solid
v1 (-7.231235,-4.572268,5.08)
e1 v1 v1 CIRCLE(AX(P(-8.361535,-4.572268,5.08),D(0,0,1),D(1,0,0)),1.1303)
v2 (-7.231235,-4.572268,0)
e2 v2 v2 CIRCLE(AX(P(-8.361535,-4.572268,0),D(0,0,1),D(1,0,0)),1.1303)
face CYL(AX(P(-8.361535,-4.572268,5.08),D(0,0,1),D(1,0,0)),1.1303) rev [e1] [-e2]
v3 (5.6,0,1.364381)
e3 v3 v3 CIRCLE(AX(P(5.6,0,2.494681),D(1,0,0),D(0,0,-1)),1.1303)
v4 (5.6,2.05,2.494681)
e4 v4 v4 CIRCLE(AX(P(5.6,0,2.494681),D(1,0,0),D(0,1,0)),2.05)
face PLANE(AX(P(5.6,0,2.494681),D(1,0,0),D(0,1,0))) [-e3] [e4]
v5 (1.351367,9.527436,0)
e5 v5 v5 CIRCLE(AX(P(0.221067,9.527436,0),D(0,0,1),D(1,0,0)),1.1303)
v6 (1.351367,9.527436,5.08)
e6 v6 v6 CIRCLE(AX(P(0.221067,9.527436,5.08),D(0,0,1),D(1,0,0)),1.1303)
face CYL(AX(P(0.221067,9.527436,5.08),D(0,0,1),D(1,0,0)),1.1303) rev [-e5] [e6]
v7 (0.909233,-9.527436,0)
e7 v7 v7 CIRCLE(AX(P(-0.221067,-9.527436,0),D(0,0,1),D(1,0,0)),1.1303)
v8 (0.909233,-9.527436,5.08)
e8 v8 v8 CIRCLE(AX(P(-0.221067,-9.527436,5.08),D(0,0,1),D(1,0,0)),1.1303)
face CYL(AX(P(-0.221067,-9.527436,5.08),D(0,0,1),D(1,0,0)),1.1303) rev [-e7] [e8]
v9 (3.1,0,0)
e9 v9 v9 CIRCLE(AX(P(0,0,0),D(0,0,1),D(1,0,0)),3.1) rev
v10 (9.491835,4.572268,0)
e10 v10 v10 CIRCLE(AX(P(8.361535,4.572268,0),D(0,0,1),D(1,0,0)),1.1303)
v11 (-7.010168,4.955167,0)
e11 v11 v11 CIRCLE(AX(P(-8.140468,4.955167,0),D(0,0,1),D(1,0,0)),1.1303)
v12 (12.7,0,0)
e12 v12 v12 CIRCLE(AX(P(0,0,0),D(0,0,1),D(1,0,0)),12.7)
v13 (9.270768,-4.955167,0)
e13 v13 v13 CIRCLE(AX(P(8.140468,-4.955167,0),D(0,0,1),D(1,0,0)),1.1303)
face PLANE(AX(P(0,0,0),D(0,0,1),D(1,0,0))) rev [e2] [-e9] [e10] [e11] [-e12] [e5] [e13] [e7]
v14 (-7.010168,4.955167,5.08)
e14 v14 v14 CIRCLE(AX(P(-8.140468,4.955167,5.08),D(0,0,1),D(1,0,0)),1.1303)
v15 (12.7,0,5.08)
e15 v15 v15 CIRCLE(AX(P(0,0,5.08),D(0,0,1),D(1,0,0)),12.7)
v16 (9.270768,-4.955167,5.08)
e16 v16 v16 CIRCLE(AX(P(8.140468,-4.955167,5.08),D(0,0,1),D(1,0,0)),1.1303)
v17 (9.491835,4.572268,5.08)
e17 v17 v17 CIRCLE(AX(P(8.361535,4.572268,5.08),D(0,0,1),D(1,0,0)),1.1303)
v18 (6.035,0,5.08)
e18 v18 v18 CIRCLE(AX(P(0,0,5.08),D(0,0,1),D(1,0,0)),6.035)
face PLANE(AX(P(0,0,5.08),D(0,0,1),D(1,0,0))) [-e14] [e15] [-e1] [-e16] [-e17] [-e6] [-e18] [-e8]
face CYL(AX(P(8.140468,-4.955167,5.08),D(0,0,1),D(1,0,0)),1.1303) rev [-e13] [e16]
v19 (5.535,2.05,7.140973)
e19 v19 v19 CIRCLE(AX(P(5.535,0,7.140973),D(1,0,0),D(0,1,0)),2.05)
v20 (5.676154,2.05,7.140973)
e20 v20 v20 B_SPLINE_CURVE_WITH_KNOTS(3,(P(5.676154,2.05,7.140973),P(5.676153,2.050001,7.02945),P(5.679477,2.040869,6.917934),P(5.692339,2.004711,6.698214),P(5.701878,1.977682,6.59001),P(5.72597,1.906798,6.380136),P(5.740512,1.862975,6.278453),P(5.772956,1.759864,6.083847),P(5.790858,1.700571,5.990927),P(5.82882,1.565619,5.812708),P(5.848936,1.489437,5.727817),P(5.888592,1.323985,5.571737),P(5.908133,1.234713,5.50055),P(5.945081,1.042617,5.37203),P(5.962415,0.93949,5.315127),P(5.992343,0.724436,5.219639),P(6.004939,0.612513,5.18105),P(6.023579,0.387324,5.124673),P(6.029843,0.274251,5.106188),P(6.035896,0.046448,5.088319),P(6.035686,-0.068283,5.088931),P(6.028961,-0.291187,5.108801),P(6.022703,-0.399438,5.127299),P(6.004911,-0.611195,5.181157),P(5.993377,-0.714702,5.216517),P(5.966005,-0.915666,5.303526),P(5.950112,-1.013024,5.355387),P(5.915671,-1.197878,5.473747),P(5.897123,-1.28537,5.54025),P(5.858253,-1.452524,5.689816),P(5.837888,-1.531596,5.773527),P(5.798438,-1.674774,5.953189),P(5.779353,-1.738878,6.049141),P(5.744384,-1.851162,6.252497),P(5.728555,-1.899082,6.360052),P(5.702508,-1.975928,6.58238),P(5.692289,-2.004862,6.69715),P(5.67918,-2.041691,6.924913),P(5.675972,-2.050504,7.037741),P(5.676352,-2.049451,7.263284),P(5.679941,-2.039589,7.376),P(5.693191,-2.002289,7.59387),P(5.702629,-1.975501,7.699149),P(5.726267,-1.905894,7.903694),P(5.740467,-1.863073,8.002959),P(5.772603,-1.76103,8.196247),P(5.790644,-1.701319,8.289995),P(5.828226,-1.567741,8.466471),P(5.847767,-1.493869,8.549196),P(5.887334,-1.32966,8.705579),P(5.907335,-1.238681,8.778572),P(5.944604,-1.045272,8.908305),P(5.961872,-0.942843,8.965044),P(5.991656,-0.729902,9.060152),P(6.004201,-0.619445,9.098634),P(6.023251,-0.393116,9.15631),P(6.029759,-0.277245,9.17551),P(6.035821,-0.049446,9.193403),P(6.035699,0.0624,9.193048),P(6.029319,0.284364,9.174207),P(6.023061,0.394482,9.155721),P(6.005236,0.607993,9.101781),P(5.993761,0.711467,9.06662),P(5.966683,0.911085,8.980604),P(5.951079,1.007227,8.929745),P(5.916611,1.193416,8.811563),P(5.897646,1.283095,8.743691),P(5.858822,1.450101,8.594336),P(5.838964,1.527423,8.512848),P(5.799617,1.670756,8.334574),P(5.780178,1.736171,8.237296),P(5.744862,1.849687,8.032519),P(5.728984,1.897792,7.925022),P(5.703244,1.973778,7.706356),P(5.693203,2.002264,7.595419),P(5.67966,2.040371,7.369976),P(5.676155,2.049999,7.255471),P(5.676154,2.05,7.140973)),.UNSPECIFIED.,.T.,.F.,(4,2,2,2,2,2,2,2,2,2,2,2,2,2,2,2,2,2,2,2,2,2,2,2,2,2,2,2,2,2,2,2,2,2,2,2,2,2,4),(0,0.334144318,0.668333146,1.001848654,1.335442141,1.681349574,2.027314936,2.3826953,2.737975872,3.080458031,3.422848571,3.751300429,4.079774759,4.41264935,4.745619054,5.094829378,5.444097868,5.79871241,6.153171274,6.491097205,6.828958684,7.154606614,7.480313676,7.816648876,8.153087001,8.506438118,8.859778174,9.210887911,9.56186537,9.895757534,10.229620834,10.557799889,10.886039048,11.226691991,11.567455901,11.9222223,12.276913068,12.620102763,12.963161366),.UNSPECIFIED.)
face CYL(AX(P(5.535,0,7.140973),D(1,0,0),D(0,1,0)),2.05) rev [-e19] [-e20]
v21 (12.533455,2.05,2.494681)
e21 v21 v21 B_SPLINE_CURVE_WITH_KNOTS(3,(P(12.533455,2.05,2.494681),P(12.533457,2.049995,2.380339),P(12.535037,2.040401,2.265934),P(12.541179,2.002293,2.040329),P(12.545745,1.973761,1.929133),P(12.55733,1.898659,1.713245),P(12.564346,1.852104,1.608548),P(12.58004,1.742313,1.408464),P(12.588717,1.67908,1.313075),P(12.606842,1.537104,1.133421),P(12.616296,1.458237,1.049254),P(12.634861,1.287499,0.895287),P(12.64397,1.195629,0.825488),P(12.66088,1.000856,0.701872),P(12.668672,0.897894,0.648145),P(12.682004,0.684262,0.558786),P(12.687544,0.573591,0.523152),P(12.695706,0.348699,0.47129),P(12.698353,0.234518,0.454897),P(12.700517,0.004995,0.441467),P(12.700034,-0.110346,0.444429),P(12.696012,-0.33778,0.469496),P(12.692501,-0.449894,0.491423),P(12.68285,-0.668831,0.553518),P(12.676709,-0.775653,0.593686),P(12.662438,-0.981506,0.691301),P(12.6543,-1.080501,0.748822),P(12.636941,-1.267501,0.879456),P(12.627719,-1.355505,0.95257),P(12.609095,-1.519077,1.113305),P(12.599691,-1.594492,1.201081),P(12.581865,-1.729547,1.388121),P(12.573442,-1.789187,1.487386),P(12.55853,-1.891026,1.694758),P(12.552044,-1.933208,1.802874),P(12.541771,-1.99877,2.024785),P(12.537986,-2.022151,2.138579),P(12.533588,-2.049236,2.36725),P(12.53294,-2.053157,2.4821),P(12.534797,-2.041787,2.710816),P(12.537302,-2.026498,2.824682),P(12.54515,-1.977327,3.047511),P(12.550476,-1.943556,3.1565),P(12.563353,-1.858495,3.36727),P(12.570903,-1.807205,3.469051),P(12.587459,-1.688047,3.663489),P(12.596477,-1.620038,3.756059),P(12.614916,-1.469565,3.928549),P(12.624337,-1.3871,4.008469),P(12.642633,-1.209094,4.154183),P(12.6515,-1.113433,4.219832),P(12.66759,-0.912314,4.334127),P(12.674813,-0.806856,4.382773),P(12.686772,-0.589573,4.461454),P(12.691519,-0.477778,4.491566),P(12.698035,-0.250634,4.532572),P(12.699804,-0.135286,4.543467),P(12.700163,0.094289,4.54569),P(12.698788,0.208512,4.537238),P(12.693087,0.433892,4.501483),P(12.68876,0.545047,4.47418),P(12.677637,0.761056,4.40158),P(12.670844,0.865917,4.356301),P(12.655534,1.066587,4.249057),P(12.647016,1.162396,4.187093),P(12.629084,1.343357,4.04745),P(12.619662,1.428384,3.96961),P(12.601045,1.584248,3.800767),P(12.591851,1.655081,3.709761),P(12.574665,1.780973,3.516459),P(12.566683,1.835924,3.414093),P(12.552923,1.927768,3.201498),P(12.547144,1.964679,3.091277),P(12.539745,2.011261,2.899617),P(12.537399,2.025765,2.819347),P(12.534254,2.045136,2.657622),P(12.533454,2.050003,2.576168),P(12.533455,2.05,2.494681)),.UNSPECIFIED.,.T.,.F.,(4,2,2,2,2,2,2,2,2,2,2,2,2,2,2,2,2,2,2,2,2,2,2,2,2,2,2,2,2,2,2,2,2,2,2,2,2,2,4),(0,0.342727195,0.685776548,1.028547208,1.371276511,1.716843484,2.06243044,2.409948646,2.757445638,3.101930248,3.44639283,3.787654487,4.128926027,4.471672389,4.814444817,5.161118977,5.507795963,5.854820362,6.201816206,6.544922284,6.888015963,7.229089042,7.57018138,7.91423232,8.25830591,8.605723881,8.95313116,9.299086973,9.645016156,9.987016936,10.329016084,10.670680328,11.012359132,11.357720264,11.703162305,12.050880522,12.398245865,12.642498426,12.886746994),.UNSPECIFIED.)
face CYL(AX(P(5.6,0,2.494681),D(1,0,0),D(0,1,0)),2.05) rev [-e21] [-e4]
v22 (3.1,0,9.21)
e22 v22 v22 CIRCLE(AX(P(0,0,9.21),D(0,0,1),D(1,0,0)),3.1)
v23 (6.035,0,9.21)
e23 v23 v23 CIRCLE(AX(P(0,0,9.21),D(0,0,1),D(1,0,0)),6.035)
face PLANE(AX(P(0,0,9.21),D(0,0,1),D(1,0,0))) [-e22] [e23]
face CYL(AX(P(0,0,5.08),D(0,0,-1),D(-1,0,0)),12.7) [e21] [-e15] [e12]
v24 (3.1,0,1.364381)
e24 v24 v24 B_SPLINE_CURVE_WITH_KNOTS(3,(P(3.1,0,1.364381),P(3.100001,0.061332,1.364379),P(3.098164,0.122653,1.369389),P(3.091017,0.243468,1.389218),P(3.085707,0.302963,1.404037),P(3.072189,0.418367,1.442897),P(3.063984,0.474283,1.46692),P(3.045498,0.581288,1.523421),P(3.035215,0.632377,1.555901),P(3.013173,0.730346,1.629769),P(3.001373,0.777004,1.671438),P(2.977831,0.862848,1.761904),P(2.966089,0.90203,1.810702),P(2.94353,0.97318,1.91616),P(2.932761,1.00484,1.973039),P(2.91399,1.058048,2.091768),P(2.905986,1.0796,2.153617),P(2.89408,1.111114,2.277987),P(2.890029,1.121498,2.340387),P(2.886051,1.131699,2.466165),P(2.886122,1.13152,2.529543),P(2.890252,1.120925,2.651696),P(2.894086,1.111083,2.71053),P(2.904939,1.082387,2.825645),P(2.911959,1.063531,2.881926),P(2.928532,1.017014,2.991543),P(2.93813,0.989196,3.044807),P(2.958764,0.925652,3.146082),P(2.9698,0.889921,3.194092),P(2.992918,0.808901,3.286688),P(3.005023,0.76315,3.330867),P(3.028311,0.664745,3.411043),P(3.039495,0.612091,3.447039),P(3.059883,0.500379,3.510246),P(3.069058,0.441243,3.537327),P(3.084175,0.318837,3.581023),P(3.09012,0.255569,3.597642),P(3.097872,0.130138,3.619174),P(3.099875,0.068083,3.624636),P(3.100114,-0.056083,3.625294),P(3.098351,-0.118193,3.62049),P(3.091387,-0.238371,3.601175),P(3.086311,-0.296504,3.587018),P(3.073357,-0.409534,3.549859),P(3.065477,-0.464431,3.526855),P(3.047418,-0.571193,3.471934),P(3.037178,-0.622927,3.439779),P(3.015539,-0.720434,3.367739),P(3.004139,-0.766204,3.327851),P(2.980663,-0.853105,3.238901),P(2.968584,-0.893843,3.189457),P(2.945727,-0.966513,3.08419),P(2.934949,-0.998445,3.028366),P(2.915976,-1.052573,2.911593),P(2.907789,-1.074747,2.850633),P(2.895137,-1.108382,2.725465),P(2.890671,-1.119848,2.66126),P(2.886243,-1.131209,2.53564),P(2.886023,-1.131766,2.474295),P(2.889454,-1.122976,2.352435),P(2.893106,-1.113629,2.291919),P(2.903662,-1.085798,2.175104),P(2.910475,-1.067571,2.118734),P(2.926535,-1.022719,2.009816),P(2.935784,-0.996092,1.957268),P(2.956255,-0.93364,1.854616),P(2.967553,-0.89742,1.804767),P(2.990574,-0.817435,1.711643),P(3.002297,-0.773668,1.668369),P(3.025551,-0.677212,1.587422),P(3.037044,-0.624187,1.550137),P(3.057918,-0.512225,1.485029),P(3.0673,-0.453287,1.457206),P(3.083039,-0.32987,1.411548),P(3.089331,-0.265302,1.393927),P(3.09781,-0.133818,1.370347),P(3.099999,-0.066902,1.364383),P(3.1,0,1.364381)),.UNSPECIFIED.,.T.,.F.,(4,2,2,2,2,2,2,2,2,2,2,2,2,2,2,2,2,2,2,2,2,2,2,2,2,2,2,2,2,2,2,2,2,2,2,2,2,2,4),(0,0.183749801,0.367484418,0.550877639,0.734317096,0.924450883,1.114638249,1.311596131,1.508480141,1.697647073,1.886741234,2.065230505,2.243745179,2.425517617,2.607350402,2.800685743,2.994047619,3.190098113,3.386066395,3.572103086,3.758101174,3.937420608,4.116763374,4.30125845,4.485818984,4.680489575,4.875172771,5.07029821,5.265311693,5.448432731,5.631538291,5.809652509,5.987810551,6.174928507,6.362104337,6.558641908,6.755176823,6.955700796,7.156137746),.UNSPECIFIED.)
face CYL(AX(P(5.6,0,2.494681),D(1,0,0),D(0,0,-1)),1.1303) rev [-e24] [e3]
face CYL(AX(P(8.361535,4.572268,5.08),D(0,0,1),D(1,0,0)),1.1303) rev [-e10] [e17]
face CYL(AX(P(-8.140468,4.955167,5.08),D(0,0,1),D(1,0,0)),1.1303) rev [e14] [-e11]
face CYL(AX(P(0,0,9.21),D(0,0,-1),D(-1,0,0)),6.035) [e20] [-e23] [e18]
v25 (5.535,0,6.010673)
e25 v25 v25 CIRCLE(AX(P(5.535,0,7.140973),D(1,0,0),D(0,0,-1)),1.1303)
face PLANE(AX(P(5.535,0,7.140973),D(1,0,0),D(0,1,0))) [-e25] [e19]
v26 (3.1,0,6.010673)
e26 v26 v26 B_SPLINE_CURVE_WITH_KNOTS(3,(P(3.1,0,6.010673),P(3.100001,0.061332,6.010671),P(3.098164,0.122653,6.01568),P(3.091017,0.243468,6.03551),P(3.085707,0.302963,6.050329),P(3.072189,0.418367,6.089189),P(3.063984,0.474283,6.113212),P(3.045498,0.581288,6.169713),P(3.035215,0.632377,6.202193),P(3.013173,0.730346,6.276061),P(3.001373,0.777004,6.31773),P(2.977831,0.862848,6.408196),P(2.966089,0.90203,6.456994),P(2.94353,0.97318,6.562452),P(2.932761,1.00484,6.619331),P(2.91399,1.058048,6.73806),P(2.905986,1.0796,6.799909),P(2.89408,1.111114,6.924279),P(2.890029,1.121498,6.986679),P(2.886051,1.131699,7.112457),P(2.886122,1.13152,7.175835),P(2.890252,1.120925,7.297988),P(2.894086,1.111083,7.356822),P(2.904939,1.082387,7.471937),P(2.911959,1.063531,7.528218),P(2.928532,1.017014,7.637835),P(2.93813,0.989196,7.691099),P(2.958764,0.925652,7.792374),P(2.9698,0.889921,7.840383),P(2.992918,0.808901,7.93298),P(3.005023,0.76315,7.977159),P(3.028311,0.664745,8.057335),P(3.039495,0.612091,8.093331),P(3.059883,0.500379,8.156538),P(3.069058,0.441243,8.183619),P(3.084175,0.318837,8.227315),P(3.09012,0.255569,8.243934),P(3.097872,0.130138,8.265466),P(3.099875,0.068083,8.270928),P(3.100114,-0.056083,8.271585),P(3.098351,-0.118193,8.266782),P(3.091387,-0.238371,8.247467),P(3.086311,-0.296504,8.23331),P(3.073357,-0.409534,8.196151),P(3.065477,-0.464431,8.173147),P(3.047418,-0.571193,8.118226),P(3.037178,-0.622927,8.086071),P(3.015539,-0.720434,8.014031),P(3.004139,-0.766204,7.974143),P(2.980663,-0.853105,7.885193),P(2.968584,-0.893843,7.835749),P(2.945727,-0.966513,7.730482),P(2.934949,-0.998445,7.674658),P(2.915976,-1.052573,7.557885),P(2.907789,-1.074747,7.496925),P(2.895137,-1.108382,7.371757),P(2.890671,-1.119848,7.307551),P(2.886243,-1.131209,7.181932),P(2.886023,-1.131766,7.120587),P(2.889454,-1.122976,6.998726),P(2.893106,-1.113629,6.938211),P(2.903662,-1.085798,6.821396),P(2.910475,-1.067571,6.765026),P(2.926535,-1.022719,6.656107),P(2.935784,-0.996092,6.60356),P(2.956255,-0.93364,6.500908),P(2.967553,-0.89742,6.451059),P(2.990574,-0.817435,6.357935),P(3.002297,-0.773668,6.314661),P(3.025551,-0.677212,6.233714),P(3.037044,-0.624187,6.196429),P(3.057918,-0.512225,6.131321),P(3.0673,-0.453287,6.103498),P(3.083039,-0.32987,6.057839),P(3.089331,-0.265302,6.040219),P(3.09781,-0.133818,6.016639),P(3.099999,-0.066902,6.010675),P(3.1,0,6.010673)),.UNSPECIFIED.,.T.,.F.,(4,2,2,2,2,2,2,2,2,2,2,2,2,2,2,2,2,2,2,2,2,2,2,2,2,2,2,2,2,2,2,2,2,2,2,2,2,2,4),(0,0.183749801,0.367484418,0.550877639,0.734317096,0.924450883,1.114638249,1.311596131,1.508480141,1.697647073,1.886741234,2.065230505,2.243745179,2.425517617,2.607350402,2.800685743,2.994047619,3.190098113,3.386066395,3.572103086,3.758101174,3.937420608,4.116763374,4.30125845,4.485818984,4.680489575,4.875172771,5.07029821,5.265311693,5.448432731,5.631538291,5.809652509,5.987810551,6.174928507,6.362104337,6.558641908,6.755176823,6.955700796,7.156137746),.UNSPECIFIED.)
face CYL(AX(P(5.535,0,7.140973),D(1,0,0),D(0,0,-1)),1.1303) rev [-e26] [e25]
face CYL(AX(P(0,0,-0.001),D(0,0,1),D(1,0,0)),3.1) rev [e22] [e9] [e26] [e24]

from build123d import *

# Parameters (mm, degrees)
SKETCH1_R                  = 12.7
BOSS_EXTRUDE1_DEPTH        = 5.08
SKETCH2_R                  = 6.035
BOSS_EXTRUDE2_DEPTH        = 4.13
CUT_EXTRUDE1_REACH         = 22.184
SKETCH3_R                  = 3.1
CRVPATTERN1_OUTLINE_R      = 1.1303
CRVPATTERN1_DEPTH          = 5.08
SKETCH16_R                 = 2.05
CUT_EXTRUDE2_DEPTH         = 0.5
F_4_40_TAPPED_HOLE3_REACH  = 26.055
F_4_40_TAPPED_HOLE3_BORE_R = 1.1303
SKETCH24_R                 = 2.05
CUT_EXTRUDE3_DEPTH         = 7.1
F_4_40_TAPPED_HOLE4_REACH  = 26.104
F_4_40_TAPPED_HOLE4_BORE_R = 1.1303


# Read off the part's stored shape, not the designer's step: CrvPattern1
with BuildPart() as part:
    # Sketch1 → Boss-Extrude1 (new body)
    with BuildSketch(Plane.XY):
        Circle(SKETCH1_R)
    extrude(amount=BOSS_EXTRUDE1_DEPTH)

    # Sketch2 → Boss-Extrude2 (add)
    with BuildSketch(Plane.XY.offset(5.08)):
        Circle(SKETCH2_R)
    extrude(amount=BOSS_EXTRUDE2_DEPTH)

    # Sketch3 → Cut-Extrude1 (cut, up to next)
    with BuildSketch(Plane.XY.offset(9.21), mode=Mode.PRIVATE) as cut_extrude1_sk1:
        Circle(SKETCH3_R)
    cut_extrude1_tool1 = extrude(cut_extrude1_sk1.sketch, amount=-CUT_EXTRUDE1_REACH, mode=Mode.PRIVATE) & part.part
    add(cut_extrude1_tool1.solids().sort_by_distance((0, 0, 9.21))[0], mode=Mode.SUBTRACT)

    # Sketch10 → #4-40 Tapped Hole2 (revolve, cut)
    with BuildSketch(Plane(origin=(0.221066647, 9.527435622, 5.08), x_dir=(0, -1, 0), z_dir=(1, 0, 0))):
        Polygon((0, 0), (0, 8.279152758), (1.1303, 7.6), (1.1303, 0), align=None)
    revolve(axis=Axis((0.221066647, 9.527435622, 11.43), (0, 0, -1)), mode=Mode.SUBTRACT)

    # CrvPattern1 outline → CrvPattern1 (cut)
    with BuildSketch(Plane.XY):
        with Locations((-8.140467958, 4.955167144)):
            Circle(CRVPATTERN1_OUTLINE_R)
        with Locations((-8.361534605, -4.572268479)):
            Circle(CRVPATTERN1_OUTLINE_R)
        with Locations((-0.221066647, -9.527435622)):
            Circle(CRVPATTERN1_OUTLINE_R)
        with Locations((8.140467958, -4.955167144)):
            Circle(CRVPATTERN1_OUTLINE_R)
        with Locations((8.361534605, 4.572268479)):
            Circle(CRVPATTERN1_OUTLINE_R)
    extrude(amount=CRVPATTERN1_DEPTH, mode=Mode.SUBTRACT)

    # Sketch16 → Cut-Extrude2 (cut)
    with BuildSketch(Plane(origin=(6.035, 0, 9.21), x_dir=(0, 0, -1), z_dir=(1, 0, 0))):
        with Locations(Location((2.069027283, 0, 0), (0, 0, 90))):
            Circle(SKETCH16_R)
    extrude(amount=-CUT_EXTRUDE2_DEPTH, mode=Mode.SUBTRACT)

    # #4-40 Tapped Hole3 bore → #4-40 Tapped Hole3 (cut, up to next)
    with BuildSketch(Plane(origin=(5.535, 0, 0), x_dir=(0, 0, -1), z_dir=(1, 0, 0)), mode=Mode.PRIVATE) as f_4_40_tapped_hole3_sk1:
        with Locations((-7.140972717, 0)):
            Circle(F_4_40_TAPPED_HOLE3_BORE_R)
    f_4_40_tapped_hole3_tool1 = extrude(f_4_40_tapped_hole3_sk1.sketch, amount=-F_4_40_TAPPED_HOLE3_REACH, mode=Mode.PRIVATE) & part.part
    add(f_4_40_tapped_hole3_tool1.solids().sort_by_distance((5.535, 0, 7.140973))[0], mode=Mode.SUBTRACT)

    # Sketch24 → Cut-Extrude3 (cut)
    with BuildSketch(Plane(origin=(12.7, 0, 5.08), x_dir=(0, 0, -1), z_dir=(1, 0, 0))):
        with Locations(Location((2.585319139, 0, 0), (0, 0, 90))):
            Circle(SKETCH24_R)
    extrude(amount=-CUT_EXTRUDE3_DEPTH, mode=Mode.SUBTRACT)

    # #4-40 Tapped Hole4 bore → #4-40 Tapped Hole4 (cut, up to next)
    with BuildSketch(Plane(origin=(5.6, 0, 0), x_dir=(0, 0, -1), z_dir=(1, 0, 0)), mode=Mode.PRIVATE) as f_4_40_tapped_hole4_sk1:
        with Locations((-2.494680861, 0)):
            Circle(F_4_40_TAPPED_HOLE4_BORE_R)
    f_4_40_tapped_hole4_tool1 = extrude(f_4_40_tapped_hole4_sk1.sketch, amount=-F_4_40_TAPPED_HOLE4_REACH, mode=Mode.PRIVATE) & part.part
    add(f_4_40_tapped_hole4_tool1.solids().sort_by_distance((5.6, 0, 2.494681))[0], mode=Mode.SUBTRACT)


solid = part.part
